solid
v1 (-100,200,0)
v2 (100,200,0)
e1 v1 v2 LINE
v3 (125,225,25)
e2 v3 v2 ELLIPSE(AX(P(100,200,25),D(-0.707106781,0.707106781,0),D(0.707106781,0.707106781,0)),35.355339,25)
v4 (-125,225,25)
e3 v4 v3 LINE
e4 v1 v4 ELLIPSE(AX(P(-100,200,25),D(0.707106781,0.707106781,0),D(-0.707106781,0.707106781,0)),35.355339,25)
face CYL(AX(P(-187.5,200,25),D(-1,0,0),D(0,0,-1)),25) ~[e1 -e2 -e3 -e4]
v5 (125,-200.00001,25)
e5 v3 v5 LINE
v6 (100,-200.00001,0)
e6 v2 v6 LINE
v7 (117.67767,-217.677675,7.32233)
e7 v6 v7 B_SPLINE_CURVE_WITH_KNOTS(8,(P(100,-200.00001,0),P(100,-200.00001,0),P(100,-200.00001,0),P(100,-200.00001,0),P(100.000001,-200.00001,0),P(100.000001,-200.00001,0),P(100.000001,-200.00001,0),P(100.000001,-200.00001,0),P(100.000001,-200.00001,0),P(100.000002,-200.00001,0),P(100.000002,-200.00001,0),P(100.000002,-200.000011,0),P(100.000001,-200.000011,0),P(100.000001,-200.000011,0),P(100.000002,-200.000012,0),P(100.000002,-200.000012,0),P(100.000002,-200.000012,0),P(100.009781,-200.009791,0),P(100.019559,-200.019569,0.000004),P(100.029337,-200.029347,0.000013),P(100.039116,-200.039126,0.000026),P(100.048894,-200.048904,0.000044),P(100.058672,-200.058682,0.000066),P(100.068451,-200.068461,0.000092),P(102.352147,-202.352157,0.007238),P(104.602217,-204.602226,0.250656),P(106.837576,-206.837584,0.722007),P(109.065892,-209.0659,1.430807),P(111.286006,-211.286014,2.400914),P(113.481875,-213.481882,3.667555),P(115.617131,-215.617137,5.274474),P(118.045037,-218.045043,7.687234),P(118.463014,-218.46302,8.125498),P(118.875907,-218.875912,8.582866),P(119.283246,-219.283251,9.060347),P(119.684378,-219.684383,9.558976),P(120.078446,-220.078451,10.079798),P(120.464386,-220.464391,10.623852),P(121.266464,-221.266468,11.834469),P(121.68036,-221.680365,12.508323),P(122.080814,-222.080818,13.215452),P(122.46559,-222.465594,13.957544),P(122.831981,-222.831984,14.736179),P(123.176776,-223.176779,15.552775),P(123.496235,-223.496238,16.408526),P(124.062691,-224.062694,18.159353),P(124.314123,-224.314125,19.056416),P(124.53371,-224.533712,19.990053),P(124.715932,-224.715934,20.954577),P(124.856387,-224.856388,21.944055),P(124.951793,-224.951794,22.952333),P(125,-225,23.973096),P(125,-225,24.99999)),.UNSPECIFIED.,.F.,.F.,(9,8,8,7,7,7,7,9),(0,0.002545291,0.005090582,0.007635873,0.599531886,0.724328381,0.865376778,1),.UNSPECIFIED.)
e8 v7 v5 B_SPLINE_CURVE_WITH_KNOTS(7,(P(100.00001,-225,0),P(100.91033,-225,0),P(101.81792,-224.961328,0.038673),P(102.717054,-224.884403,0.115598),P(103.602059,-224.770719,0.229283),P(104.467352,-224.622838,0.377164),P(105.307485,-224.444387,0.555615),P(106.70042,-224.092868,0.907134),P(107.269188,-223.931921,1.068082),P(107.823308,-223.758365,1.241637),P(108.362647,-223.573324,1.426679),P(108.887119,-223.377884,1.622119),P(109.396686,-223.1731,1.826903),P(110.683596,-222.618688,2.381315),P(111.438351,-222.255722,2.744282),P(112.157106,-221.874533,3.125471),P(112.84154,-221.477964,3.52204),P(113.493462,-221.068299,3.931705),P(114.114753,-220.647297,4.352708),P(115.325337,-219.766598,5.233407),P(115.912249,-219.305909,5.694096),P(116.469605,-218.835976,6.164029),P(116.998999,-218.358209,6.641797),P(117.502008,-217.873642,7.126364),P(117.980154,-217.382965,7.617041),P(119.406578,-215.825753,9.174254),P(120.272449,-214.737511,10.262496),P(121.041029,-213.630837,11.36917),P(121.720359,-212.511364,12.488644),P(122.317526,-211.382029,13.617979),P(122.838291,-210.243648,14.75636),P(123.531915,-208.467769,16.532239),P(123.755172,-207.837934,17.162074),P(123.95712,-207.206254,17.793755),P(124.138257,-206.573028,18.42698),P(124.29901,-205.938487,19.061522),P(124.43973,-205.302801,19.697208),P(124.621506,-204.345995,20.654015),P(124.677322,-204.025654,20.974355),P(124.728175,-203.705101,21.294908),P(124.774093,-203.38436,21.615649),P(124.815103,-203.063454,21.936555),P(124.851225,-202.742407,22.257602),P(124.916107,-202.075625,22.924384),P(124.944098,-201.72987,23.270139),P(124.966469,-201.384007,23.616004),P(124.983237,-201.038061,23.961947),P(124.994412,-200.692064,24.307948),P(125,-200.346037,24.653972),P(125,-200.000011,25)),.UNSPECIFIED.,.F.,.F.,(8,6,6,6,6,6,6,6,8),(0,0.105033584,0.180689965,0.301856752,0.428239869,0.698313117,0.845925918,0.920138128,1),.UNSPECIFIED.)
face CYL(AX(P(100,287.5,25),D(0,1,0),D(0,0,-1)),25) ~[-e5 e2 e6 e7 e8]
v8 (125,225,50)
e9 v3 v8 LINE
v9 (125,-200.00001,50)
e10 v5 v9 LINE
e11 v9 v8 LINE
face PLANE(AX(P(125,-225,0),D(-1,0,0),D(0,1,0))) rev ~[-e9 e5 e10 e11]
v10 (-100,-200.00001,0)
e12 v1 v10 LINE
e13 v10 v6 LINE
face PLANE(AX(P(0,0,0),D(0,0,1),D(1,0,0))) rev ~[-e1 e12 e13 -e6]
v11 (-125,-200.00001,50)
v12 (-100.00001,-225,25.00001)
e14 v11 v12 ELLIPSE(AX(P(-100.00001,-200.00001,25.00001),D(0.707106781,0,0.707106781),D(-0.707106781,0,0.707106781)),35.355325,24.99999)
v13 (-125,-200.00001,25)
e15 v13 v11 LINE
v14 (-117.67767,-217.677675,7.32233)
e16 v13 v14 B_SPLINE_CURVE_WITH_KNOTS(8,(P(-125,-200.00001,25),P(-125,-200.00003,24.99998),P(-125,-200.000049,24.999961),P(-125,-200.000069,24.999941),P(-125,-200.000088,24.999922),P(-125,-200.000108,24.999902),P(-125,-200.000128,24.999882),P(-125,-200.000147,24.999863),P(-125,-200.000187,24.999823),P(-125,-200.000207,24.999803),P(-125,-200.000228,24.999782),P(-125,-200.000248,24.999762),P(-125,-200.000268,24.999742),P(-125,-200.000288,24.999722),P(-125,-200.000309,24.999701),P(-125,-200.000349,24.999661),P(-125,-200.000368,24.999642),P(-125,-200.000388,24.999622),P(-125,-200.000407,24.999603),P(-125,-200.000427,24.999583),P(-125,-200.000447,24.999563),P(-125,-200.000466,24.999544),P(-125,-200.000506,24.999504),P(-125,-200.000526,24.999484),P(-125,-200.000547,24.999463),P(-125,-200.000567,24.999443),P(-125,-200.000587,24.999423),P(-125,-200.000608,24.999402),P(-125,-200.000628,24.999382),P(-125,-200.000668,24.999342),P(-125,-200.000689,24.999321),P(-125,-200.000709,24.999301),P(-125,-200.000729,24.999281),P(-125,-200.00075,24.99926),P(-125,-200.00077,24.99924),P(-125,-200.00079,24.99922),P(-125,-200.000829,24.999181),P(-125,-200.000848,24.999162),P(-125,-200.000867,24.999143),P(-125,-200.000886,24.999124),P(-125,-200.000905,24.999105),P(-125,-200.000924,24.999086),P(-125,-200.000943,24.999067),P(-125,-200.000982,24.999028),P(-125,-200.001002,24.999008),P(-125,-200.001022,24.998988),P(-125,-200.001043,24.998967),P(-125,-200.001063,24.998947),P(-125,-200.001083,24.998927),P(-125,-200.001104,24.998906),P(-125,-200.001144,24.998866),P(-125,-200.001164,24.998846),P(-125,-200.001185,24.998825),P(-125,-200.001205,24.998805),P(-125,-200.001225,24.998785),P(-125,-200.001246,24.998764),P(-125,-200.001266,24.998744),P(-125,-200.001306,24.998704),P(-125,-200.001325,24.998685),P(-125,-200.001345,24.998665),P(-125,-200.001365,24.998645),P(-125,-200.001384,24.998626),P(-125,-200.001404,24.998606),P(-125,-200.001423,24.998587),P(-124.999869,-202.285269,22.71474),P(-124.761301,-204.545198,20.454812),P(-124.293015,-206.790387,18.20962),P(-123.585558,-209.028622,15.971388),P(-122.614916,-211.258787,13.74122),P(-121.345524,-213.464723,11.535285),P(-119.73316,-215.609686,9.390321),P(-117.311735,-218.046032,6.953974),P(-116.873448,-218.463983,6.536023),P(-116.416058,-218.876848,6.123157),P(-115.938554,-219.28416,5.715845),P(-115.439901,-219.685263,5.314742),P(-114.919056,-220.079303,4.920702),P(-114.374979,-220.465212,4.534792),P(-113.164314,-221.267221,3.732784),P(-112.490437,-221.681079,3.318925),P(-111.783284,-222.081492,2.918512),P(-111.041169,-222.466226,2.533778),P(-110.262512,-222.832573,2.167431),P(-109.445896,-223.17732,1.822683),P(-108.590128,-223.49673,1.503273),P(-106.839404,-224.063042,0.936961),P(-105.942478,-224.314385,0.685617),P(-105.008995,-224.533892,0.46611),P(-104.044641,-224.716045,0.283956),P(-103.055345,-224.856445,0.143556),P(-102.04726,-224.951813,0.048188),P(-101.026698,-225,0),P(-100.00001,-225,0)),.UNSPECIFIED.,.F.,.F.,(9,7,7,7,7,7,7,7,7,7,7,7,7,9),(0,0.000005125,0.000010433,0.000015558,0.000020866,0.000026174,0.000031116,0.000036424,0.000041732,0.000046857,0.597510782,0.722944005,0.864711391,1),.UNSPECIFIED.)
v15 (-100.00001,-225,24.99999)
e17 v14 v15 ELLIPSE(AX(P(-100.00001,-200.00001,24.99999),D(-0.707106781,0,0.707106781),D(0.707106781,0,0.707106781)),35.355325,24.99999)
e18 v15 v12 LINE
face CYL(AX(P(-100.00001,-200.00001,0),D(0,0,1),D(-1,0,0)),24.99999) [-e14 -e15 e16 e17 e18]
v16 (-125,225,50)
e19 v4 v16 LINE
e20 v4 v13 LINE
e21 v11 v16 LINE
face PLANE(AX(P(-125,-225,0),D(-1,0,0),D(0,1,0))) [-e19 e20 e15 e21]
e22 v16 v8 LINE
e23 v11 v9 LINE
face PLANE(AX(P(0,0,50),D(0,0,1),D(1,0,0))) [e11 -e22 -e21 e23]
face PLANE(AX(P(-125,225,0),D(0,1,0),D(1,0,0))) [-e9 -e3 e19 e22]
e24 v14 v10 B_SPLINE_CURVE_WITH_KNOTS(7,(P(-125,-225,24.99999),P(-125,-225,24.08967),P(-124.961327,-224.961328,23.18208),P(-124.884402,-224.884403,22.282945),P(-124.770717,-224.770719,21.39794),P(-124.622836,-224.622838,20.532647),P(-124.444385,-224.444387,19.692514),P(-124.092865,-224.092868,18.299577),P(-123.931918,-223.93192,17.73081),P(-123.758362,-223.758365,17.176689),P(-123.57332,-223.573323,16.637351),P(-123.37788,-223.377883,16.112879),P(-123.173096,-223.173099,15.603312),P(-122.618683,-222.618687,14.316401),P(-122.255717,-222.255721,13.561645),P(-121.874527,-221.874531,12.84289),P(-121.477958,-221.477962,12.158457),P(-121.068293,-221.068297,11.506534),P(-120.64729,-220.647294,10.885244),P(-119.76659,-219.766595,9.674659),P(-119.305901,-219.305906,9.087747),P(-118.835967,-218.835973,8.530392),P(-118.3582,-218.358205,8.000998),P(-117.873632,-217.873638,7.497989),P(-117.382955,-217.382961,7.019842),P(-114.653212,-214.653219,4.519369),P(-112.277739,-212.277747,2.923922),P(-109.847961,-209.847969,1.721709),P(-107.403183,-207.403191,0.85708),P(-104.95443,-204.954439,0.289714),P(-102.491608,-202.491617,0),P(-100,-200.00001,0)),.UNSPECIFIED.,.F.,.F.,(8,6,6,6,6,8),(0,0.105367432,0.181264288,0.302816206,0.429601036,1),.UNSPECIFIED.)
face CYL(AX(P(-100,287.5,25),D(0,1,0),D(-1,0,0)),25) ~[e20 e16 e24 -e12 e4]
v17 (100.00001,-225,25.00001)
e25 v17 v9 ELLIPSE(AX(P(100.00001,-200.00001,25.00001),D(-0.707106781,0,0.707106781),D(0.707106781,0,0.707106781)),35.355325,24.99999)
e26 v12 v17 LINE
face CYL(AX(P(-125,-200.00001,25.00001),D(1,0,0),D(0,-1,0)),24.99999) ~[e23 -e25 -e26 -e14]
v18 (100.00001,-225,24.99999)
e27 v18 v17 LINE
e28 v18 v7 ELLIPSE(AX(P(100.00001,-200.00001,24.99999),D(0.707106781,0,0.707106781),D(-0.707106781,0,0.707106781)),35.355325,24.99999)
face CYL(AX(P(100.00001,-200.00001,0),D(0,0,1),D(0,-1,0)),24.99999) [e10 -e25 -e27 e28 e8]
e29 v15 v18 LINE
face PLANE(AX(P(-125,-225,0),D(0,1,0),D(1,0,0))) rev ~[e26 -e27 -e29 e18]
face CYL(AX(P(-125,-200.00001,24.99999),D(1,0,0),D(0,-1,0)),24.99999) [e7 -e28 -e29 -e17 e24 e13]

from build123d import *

# Parameters (mm, degrees)
F0_W        = 250
F0_H        = 450
F1_DEPTH    = 50
F2_R        = 24.99999
F3_T1_DEPTH = 550.00001
F3_T3_DEPTH = 375


# Not quite as in the source:
# - a fillet or chamfer that OpenCascade refuses, or shapes differently, is made with other operations: its cross-section is extruded or revolved along the edge and cut away or added
# - a fillet or chamfer is up to 0.001 mm smaller than in the source, because OpenCascade refuses the exact size


with BuildPart() as f1:
    # F0 (on Top) → F1 (new body)
    with BuildSketch(Plane.XY):
        Rectangle(F0_W, F0_H)
    extrude(amount=F1_DEPTH)

    # F2 (radius 25 in the source; OpenCascade refuses exactly that, so slightly less here)
    f2_edges = [f1.edges().sort_by_distance(p)[0] for p in [
        (-125, -225, 25),
        (125, -225, 25),
        (0, -225, 0),
        (0, -225, 50),
    ]]
    fillet(f2_edges, radius=F2_R)

    # F3: fillet of radius 25 on 4 edges, made by hand

    # F3_s2 → F3_t1 (cut)
    with BuildSketch(Plane.XZ.offset(-287.5)):
        with BuildLine():
            ThreePointArc((-125, 25), (-117.6776695297, 7.3223304703), (-100, 0))
            Line((-100, 0), (-125, 0))
            Line((-125, 0), (-125, 25))
        make_face()
        with BuildLine():
            ThreePointArc((100, 0), (117.6776695297, 7.3223304703), (125, 25))
            Line((125, 25), (125, 0))
            Line((125, 0), (100, 0))
        make_face()
    extrude(amount=F3_T1_DEPTH, mode=Mode.SUBTRACT)

    # F3_s4 → F3_t3 (cut)
    with BuildSketch(Plane.YZ.offset(-187.5)):
        with BuildLine():
            ThreePointArc((200, 0), (217.6776695297, 7.3223304703), (225, 25))
            Line((225, 25), (225, 0))
            Line((225, 0), (200, 0))
        make_face()
    extrude(amount=F3_T3_DEPTH, mode=Mode.SUBTRACT)


solid = f1.part
